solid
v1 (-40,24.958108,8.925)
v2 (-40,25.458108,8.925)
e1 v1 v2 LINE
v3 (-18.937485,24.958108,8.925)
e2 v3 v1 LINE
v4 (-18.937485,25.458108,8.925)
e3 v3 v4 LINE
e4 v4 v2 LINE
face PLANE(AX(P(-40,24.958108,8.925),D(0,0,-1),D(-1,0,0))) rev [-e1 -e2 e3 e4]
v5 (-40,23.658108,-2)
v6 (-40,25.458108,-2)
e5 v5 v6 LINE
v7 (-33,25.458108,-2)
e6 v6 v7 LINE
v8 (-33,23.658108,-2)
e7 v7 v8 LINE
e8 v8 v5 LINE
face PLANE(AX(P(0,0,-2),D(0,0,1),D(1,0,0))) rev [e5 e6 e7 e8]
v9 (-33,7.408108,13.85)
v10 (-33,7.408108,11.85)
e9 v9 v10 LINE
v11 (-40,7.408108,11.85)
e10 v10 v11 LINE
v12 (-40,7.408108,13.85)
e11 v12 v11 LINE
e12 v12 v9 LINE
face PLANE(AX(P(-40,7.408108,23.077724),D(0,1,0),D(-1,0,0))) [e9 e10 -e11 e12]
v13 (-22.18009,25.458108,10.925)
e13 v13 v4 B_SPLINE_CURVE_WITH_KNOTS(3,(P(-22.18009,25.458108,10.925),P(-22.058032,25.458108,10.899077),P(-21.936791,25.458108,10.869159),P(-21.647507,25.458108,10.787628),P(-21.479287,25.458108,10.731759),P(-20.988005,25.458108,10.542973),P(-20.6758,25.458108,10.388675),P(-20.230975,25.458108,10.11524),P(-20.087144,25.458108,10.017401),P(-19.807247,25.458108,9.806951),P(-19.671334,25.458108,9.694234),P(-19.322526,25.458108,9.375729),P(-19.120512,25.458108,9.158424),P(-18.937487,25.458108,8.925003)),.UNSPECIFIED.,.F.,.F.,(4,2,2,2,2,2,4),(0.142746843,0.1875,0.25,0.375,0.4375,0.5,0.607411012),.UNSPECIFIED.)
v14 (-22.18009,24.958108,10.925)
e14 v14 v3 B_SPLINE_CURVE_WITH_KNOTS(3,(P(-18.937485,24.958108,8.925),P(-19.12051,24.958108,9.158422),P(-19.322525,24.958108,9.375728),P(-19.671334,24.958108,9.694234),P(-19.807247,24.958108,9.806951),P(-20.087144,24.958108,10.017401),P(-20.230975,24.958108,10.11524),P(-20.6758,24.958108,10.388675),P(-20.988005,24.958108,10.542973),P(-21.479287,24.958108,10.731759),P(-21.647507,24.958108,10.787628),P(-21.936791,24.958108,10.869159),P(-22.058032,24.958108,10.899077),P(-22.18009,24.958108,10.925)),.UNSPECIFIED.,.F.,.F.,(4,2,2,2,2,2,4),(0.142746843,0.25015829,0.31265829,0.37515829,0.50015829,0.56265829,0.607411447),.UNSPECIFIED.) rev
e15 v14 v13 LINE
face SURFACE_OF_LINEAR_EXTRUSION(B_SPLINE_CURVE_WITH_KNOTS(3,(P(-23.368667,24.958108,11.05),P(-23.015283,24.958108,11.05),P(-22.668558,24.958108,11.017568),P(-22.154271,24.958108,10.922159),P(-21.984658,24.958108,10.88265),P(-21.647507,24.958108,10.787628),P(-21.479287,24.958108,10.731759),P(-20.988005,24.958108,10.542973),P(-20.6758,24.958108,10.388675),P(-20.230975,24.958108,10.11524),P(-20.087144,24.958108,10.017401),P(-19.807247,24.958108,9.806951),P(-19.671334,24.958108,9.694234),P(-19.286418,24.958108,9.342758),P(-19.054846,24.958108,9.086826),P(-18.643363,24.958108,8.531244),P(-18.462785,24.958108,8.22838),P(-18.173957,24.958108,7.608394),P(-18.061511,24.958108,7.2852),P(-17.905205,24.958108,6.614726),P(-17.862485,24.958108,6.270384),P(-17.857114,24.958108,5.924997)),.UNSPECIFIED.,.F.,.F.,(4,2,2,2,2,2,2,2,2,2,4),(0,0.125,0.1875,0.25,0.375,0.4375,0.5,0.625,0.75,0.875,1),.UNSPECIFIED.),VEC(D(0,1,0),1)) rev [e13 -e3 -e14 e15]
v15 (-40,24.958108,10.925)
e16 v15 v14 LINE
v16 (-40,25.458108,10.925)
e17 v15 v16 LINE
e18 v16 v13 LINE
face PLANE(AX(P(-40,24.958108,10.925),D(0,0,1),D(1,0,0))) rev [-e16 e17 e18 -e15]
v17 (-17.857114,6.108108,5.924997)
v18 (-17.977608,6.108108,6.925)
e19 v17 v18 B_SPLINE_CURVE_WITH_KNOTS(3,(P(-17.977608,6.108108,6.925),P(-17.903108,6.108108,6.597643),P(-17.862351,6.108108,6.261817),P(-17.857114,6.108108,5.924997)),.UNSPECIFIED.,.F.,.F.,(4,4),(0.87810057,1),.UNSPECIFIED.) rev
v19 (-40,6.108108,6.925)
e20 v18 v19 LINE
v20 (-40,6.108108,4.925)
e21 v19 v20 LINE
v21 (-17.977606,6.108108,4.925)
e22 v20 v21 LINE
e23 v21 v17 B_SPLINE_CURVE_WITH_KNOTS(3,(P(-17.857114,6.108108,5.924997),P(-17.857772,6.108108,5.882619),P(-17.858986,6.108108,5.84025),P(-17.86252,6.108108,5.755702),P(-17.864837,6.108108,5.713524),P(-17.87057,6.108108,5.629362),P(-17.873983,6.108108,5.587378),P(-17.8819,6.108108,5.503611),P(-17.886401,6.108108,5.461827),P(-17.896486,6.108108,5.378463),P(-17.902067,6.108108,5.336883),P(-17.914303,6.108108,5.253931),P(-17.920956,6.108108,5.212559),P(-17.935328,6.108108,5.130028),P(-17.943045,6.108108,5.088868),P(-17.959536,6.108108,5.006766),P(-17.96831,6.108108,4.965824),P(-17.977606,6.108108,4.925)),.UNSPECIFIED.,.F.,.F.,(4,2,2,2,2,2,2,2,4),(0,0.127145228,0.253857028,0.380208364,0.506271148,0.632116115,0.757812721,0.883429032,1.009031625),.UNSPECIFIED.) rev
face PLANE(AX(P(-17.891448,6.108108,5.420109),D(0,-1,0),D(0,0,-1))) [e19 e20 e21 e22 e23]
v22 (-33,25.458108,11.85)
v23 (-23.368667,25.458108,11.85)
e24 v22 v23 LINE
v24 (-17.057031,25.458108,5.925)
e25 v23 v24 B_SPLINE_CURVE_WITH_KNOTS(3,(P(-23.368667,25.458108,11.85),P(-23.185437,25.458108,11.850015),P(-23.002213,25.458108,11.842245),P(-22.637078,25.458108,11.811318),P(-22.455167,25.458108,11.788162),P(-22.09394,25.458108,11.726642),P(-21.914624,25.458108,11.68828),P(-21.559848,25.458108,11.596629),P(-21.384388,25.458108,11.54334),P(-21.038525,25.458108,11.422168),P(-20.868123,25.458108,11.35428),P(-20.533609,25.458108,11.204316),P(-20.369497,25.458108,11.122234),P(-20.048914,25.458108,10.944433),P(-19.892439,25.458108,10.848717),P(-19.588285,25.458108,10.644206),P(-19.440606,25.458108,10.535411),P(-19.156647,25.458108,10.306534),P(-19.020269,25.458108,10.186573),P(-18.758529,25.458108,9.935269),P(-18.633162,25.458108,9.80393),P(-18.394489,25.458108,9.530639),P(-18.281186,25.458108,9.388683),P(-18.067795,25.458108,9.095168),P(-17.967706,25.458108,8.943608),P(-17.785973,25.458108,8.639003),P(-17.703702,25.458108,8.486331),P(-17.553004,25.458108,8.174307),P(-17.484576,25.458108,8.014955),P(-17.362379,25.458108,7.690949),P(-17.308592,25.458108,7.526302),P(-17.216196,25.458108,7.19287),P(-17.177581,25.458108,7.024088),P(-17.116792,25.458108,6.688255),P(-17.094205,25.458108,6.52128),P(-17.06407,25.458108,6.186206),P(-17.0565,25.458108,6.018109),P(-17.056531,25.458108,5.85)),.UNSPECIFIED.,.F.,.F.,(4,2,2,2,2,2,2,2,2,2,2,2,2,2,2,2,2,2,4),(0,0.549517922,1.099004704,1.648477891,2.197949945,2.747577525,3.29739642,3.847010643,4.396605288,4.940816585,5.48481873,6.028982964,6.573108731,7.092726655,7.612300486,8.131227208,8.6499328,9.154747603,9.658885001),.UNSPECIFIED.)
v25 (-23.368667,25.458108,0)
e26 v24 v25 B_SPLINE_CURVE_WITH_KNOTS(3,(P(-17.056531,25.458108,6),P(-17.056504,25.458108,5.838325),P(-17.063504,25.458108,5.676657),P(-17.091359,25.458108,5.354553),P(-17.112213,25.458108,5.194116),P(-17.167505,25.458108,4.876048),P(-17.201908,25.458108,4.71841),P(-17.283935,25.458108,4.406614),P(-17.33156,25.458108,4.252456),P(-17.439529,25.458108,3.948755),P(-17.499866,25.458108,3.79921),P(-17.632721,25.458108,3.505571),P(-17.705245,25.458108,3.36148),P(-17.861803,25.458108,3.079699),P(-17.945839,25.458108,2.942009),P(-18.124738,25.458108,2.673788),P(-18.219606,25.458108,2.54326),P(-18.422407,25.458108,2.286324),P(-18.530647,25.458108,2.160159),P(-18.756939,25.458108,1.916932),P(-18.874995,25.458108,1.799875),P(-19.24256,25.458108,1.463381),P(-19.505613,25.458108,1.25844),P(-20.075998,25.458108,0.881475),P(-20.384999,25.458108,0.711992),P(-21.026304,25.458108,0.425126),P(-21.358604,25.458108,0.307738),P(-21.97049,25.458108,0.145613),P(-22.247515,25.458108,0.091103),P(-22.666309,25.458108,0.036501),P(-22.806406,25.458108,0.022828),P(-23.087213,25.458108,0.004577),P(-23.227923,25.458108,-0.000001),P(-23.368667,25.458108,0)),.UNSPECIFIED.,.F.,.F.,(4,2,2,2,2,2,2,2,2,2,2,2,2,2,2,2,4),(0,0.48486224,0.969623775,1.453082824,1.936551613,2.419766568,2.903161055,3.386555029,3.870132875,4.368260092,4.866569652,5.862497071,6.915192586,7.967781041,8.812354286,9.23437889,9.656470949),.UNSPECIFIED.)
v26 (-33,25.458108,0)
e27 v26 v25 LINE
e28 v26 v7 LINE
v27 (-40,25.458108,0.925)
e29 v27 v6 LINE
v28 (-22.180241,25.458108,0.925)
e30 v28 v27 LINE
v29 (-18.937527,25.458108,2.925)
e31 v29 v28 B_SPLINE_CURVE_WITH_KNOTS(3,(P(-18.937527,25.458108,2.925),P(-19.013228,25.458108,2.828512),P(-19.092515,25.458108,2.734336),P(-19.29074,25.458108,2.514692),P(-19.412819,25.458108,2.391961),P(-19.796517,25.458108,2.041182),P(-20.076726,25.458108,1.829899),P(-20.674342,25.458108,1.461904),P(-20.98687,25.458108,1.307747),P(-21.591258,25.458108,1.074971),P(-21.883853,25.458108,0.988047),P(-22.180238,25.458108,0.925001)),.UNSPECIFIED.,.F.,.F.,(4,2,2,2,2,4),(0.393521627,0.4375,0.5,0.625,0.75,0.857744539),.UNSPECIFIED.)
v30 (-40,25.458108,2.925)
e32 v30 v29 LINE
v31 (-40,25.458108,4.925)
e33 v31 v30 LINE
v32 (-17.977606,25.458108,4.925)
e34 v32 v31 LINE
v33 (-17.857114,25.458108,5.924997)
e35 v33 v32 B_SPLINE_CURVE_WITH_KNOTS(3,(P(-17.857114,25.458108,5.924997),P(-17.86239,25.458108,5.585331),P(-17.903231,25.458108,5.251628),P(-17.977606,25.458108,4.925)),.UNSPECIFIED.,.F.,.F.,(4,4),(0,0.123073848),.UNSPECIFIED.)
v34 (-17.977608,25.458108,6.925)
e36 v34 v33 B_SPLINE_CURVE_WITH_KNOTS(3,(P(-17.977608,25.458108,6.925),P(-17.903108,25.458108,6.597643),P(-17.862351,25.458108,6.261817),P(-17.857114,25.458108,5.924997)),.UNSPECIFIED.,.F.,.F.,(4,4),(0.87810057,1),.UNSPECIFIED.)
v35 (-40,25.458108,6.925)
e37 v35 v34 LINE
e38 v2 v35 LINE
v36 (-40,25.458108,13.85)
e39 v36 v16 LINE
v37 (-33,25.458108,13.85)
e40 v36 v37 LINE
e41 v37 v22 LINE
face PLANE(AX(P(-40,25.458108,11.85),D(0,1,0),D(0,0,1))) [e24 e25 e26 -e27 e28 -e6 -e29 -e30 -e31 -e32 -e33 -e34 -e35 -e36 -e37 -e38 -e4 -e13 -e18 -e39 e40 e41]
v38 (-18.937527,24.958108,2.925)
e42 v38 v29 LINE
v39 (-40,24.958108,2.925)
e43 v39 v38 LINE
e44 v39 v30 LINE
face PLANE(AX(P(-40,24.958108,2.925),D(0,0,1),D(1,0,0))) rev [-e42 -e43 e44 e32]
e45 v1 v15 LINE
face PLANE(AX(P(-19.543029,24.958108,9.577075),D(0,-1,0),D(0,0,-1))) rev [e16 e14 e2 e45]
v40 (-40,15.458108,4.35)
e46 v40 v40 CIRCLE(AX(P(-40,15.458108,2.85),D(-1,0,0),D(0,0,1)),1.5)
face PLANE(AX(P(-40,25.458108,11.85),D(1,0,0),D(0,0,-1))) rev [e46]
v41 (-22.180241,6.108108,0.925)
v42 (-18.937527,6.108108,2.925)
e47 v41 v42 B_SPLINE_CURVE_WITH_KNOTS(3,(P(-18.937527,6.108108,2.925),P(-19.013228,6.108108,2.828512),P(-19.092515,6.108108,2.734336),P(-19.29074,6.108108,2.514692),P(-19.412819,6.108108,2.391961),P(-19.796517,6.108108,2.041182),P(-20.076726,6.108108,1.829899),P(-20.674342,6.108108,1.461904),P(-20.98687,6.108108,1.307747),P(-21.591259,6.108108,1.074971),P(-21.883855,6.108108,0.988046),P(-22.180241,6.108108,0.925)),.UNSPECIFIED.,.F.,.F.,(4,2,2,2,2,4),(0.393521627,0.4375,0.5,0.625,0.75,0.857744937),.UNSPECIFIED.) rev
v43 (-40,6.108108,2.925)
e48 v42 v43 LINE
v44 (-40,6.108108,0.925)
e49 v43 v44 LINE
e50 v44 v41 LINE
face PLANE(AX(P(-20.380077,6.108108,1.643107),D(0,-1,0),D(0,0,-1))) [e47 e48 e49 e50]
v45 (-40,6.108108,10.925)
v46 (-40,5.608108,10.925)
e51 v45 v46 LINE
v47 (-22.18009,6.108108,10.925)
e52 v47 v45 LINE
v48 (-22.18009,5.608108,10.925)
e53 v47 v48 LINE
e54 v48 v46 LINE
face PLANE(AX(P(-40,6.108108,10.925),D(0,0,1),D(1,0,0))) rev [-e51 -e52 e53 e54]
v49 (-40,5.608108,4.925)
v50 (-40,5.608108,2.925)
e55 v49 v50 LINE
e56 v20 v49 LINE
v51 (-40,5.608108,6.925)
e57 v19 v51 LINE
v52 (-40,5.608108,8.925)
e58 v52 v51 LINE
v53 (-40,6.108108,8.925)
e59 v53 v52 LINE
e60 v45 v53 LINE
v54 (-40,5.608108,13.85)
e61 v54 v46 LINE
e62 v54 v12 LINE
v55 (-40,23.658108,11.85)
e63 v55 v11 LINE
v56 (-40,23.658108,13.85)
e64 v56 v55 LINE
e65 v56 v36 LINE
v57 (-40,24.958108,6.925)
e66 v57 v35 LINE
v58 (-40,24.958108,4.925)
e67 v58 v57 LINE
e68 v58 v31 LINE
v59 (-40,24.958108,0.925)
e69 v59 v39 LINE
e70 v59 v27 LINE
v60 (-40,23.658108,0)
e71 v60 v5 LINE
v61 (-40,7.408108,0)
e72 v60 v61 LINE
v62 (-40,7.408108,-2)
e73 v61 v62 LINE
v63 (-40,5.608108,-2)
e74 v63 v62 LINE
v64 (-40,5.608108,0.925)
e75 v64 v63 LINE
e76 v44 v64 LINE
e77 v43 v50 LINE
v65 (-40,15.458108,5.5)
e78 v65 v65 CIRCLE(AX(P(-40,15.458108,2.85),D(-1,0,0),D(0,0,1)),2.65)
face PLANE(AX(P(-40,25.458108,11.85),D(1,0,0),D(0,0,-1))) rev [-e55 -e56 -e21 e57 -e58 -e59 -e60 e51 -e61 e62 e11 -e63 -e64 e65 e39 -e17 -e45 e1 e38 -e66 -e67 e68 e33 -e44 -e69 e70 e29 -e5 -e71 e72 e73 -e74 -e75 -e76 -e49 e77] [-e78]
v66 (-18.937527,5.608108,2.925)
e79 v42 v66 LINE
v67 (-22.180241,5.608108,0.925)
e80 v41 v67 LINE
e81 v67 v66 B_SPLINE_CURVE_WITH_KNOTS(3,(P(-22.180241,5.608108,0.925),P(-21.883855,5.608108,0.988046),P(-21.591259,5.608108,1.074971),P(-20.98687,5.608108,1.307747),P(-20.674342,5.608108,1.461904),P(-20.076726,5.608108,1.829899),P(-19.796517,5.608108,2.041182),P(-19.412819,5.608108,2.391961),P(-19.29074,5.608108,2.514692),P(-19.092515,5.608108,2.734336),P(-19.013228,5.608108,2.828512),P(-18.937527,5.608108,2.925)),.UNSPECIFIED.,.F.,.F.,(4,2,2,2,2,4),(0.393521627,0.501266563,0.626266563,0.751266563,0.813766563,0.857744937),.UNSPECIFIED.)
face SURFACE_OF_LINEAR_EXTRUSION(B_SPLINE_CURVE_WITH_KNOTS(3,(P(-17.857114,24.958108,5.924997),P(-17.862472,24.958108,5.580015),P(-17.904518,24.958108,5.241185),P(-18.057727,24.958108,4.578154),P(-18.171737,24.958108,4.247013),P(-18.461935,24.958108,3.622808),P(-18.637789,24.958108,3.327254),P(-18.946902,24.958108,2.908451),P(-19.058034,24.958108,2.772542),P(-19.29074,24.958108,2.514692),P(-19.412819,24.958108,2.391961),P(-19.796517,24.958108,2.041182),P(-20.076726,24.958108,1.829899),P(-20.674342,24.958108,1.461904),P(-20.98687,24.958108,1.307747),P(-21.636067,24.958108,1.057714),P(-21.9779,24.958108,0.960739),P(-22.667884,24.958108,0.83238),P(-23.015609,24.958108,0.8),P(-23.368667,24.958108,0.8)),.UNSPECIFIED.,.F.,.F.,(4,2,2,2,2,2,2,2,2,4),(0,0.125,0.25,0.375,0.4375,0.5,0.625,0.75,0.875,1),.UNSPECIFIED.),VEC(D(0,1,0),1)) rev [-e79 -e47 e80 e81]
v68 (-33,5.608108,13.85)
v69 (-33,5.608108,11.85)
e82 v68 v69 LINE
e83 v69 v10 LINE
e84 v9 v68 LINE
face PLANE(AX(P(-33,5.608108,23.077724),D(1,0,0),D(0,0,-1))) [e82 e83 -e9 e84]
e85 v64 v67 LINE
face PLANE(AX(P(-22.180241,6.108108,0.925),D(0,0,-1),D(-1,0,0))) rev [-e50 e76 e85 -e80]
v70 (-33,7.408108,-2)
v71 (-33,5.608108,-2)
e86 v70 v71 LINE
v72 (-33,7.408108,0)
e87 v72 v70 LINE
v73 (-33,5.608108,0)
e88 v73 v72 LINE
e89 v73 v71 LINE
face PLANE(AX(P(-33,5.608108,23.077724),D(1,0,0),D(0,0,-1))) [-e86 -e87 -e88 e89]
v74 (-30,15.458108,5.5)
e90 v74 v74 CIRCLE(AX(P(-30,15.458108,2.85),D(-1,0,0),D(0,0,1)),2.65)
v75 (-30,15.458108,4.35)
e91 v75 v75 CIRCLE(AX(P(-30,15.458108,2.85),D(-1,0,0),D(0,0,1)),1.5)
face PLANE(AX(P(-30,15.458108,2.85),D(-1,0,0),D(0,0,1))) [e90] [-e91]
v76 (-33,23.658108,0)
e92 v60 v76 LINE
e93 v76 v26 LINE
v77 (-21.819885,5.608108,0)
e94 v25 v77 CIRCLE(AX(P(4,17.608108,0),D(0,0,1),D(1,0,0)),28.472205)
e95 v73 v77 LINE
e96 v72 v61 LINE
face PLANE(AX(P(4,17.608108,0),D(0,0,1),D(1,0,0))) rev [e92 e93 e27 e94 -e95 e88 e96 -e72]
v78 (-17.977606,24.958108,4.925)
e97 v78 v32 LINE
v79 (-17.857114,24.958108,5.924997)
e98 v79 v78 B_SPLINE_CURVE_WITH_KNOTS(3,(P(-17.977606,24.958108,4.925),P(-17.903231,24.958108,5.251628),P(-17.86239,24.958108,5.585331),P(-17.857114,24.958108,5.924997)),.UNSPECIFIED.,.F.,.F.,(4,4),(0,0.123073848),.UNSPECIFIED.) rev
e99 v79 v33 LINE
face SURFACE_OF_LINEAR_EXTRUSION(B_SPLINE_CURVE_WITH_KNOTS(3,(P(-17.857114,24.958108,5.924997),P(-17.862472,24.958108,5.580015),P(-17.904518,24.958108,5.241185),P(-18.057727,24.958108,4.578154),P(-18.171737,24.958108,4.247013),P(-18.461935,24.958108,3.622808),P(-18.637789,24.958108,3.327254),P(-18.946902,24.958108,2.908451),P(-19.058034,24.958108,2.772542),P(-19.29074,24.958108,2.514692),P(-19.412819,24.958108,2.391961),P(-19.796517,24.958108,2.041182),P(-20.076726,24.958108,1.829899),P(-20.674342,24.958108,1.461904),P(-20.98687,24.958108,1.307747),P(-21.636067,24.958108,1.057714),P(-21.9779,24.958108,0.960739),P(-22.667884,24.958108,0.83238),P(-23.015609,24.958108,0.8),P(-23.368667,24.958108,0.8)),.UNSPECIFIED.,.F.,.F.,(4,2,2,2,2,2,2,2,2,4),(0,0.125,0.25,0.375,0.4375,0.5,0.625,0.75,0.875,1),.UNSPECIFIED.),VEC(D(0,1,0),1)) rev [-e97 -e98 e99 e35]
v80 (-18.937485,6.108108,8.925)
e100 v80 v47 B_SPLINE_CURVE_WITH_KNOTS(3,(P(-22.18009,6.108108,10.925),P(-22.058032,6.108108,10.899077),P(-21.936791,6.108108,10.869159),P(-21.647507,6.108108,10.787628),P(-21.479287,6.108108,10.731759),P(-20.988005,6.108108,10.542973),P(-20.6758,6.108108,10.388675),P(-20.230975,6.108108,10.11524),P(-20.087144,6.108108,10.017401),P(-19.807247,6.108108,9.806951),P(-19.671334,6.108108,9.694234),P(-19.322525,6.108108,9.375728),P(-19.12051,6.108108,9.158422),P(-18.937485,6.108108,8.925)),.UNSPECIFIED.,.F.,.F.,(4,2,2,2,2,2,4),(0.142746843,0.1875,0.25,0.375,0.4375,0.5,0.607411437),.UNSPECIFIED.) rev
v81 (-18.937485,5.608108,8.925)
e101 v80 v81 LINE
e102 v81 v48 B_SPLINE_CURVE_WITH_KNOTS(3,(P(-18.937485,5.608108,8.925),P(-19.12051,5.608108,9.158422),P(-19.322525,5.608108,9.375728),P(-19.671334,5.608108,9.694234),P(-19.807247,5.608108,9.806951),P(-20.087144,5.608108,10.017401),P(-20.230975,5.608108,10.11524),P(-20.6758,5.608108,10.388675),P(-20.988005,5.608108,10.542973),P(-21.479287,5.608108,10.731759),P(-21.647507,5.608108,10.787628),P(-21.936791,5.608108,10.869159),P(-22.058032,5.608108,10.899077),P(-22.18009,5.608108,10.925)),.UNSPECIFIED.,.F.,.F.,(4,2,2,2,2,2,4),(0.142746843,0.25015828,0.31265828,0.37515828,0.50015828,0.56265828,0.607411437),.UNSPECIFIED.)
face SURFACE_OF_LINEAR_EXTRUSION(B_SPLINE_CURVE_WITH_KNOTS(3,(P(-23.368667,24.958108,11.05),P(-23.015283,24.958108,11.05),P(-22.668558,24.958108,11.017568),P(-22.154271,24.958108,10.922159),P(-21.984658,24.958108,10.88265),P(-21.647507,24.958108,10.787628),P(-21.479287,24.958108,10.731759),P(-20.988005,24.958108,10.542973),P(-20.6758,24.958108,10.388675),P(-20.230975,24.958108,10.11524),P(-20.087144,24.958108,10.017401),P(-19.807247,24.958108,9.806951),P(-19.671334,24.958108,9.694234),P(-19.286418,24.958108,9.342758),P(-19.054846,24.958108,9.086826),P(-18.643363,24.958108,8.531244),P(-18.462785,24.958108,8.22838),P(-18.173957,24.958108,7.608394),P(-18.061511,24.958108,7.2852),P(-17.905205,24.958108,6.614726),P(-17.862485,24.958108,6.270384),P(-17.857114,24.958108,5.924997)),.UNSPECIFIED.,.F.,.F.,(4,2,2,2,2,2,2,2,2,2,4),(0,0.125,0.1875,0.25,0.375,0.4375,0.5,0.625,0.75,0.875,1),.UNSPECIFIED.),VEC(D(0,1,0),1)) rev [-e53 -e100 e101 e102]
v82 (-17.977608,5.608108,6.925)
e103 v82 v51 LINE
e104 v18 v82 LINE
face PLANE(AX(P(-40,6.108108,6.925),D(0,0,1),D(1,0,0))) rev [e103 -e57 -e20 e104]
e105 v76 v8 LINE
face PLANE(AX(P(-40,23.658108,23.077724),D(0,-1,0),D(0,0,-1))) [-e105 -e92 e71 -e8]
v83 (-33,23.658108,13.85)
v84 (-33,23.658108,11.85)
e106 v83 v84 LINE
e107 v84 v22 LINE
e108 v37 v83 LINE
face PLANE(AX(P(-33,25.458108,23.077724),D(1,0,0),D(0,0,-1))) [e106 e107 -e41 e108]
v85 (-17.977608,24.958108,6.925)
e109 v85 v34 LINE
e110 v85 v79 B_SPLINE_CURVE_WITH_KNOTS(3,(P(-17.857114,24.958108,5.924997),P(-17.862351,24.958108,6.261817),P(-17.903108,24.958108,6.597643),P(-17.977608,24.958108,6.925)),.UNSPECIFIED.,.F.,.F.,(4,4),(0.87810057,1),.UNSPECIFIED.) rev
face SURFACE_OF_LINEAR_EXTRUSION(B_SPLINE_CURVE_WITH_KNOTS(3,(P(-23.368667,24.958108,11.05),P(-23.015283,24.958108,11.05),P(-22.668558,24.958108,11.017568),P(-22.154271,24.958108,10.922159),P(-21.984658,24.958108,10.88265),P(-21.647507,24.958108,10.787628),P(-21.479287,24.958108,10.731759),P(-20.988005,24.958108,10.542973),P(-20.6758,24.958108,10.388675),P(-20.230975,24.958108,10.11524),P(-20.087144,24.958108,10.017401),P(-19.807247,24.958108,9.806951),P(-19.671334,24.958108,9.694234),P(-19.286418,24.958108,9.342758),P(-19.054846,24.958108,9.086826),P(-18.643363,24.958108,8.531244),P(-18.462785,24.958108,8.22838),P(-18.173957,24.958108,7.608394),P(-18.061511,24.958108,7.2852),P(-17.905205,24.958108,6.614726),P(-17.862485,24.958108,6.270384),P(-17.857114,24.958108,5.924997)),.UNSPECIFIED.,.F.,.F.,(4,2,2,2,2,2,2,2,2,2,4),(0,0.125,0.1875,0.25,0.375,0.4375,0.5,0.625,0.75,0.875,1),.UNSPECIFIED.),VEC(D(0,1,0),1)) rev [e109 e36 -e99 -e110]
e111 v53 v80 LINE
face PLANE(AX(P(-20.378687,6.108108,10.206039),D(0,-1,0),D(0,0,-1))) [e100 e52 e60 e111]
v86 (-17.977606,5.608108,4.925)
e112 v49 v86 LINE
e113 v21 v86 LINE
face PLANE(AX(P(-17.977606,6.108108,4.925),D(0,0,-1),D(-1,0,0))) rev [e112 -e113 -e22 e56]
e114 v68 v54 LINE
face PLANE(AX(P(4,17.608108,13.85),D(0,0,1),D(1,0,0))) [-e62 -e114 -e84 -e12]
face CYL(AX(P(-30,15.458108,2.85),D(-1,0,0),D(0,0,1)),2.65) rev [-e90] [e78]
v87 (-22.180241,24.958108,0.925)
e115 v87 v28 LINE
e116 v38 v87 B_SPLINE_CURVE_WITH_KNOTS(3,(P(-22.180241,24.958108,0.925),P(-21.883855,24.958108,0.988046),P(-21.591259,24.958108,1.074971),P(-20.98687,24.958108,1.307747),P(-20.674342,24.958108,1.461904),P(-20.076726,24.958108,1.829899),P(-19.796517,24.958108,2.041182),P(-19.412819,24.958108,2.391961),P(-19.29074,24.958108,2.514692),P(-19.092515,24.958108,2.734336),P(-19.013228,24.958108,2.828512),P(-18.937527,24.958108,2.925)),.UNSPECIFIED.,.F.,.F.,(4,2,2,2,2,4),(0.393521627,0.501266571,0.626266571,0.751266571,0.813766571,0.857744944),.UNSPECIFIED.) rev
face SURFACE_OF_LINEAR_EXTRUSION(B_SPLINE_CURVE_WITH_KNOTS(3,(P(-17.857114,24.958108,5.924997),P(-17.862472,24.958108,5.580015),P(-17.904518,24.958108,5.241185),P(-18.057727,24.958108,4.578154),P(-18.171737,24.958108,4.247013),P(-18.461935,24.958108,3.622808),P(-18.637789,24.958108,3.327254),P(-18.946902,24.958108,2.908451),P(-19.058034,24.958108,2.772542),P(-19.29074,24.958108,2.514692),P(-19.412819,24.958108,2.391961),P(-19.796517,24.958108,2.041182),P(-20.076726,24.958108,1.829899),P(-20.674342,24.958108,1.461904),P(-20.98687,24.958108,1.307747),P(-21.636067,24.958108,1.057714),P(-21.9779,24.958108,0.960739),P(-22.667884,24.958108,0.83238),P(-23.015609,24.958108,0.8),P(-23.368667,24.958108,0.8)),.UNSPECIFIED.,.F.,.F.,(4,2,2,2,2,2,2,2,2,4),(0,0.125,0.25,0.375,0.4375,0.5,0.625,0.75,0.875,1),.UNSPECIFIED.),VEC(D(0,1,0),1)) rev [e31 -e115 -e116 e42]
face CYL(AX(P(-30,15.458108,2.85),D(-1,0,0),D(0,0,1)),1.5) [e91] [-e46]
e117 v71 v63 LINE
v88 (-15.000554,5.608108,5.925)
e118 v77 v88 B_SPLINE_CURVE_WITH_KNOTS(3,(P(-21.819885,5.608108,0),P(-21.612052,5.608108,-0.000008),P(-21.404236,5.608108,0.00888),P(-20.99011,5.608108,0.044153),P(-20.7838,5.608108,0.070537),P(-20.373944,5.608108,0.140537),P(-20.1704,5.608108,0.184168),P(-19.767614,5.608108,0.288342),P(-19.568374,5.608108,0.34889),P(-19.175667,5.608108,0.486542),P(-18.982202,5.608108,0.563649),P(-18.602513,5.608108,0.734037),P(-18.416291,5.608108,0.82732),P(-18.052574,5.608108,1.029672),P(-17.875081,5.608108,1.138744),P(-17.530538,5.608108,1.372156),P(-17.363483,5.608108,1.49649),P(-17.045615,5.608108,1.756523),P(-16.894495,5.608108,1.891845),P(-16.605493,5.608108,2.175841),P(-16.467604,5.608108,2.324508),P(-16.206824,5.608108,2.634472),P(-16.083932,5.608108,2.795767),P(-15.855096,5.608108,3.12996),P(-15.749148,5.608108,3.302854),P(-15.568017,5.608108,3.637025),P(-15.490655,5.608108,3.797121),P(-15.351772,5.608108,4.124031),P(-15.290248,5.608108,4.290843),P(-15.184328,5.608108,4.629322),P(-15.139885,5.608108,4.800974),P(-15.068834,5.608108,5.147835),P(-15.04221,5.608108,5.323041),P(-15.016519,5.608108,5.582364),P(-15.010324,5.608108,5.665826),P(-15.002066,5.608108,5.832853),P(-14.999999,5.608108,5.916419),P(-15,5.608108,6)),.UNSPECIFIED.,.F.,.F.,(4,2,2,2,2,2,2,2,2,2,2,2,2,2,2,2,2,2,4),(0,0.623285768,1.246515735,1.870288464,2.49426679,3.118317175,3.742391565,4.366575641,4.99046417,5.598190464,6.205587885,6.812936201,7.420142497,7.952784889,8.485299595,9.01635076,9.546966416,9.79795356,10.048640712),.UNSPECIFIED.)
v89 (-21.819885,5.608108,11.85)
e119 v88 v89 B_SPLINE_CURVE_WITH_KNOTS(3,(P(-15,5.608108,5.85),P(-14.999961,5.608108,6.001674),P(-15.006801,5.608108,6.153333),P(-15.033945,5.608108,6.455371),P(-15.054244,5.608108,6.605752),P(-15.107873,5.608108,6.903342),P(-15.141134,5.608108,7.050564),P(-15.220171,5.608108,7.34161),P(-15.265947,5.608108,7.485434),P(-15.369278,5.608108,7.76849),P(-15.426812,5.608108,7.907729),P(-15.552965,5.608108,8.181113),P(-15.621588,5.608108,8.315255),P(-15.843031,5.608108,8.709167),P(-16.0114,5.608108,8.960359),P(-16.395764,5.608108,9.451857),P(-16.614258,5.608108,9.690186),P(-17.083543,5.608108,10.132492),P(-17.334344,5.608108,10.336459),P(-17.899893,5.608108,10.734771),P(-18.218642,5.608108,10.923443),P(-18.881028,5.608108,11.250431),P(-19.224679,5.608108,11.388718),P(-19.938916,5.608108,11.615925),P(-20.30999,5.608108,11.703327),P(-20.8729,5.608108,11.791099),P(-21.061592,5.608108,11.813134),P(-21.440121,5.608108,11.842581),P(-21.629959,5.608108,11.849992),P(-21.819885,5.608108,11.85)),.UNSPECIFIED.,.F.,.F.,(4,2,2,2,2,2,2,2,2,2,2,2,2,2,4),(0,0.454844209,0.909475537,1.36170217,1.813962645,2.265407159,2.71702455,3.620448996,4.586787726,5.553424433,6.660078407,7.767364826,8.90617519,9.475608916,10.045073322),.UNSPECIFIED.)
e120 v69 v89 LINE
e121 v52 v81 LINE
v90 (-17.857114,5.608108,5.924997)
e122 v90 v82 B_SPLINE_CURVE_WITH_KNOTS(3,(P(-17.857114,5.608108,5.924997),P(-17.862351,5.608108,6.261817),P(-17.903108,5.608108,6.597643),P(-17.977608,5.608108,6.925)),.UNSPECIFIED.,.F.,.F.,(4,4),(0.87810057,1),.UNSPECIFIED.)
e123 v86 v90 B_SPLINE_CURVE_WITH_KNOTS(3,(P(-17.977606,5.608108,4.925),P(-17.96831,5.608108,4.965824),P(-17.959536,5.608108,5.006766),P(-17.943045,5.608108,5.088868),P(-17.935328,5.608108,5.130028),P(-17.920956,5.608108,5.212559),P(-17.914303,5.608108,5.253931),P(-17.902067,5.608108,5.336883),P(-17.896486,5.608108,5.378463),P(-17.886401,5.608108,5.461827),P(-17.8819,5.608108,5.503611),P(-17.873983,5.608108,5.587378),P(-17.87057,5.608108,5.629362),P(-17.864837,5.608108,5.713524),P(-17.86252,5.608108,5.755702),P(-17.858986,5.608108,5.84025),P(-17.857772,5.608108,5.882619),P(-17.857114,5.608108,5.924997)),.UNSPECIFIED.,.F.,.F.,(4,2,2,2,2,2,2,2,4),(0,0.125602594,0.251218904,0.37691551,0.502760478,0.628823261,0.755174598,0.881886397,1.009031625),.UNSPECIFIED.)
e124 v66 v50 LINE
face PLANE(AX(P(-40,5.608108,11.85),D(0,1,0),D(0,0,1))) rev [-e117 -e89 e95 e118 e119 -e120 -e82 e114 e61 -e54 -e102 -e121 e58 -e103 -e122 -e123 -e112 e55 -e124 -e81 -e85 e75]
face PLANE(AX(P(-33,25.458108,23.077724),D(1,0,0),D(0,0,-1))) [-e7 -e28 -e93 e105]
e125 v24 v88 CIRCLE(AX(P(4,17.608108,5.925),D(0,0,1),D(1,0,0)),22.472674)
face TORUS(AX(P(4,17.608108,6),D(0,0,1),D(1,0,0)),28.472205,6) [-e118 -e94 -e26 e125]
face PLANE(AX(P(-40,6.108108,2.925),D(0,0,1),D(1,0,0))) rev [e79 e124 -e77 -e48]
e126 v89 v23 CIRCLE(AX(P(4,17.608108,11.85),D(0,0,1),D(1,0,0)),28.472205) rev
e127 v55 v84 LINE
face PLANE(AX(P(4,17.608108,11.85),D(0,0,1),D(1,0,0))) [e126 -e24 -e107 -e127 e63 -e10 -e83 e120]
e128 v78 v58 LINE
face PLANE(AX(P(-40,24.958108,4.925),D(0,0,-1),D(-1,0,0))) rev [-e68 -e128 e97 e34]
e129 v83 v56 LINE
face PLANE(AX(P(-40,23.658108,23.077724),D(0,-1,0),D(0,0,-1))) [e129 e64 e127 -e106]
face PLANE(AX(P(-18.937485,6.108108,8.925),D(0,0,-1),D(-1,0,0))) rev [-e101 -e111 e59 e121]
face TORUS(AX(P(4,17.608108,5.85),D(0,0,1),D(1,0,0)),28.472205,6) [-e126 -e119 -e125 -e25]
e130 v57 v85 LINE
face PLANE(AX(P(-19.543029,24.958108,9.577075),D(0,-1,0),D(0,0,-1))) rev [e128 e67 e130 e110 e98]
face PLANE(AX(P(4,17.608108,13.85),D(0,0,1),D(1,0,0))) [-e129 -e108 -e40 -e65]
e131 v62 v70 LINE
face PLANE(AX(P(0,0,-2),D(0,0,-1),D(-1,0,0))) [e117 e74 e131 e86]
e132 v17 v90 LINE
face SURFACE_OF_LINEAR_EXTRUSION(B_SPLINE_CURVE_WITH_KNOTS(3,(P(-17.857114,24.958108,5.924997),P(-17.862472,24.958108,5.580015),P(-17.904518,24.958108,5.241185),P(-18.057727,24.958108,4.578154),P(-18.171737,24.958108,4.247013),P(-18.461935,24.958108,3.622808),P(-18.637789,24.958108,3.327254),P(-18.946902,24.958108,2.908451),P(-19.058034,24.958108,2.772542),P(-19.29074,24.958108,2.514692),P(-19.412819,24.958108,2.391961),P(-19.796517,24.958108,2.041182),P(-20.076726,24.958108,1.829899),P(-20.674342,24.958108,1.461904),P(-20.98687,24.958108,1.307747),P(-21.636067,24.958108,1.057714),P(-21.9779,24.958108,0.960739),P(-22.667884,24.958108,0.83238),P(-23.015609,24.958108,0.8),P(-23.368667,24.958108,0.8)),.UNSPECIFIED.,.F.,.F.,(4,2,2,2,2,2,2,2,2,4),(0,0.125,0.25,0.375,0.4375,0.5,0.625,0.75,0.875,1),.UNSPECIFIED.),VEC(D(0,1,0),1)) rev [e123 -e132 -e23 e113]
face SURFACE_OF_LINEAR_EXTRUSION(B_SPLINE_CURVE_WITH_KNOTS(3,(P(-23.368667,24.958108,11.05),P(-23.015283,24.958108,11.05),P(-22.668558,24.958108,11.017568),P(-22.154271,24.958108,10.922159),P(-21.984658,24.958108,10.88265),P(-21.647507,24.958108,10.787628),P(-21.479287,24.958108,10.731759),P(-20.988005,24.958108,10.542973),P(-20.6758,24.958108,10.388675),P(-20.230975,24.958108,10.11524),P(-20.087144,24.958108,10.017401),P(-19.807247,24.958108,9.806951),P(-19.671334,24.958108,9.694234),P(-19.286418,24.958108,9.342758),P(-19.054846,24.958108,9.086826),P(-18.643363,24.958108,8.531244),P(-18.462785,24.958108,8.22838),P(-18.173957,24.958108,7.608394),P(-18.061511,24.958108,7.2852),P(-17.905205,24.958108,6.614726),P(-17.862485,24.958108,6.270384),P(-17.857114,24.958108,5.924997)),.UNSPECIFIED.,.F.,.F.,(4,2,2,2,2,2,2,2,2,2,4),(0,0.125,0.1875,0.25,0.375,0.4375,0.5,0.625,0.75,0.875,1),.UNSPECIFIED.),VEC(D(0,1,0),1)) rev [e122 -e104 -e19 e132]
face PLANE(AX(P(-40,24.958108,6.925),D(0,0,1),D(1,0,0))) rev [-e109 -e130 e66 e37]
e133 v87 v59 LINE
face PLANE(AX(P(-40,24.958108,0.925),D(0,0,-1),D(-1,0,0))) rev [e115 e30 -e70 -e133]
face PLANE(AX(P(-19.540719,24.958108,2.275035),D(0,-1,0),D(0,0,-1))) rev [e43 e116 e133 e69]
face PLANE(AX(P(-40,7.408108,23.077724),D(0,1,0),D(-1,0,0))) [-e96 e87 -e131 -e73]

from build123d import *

# Parameters (mm, degrees)
BOSS_EXTRUDE1_DEPTH      = 11.85
BOSS_EXTRUDE2_DEPTH      = 2
BOSS_EXTRUDE2_DEPTH_BACK = 13.85
SKETCH2_W                = 7
SKETCH2_H                = 1.8
FILLET1_R                = 6
CUT_EXTRUDE1_DEPTH       = 0.5
CUT_EXTRUDE2_DEPTH       = 0.5
SKETCH6_R                = 2.65
SKETCH6_R_2              = 1.5
CUT_EXTRUDE3_DEPTH       = 10


with BuildPart() as part:
    # Sketch1 → Boss-Extrude1 (new body)
    with BuildSketch(Plane.XY):
        with BuildLine():
            Line((-40, 25.458108108), (-17.056531053, 25.458108108))
            ThreePointArc((-17.056531053, 25.458108108), (-18.352562381, 15.292302634), (-15, 5.608108108))
            Line((-15, 5.608108108), (-40, 5.608108108))
            Line((-40, 5.608108108), (-40, 25.458108108))
        make_face()
    extrude(amount=BOSS_EXTRUDE1_DEPTH)

    # Sketch2 → Boss-Extrude2 (add, two sides: drawn at the far end of the back side and taken through both)
    with BuildSketch(Plane(origin=(0, 0, 0), x_dir=(-1, 0, 0), z_dir=(0, 0, -1)).offset(-BOSS_EXTRUDE2_DEPTH_BACK)):
        with Locations((36.5, 6.508108108)):
            Rectangle(SKETCH2_W, SKETCH2_H)
        with Locations((36.5, 24.558108108)):
            Rectangle(SKETCH2_W, SKETCH2_H)
    extrude(amount=BOSS_EXTRUDE2_DEPTH + BOSS_EXTRUDE2_DEPTH_BACK)

    # Fillet1
    # the kernel refuses this fillet: 6 mm, written as the material it takes off along each edge
    with BuildSketch(Plane(origin=(4, 17.608108108, 0), x_dir=(-0.5195868737353421, 0.854417626598336, 0), z_dir=(0.854417626598336, 0.5195868737353421, 0))) as fillet1_piece_1:
        with BuildLine():
            CenterArc((22.472205054 + FILLET1_R, FILLET1_R), FILLET1_R, 180, 90)
            Line((22.472205054 + FILLET1_R, 0), (22.472205054, 0))
            Line((22.472205054, 0), (22.472205054, FILLET1_R))
        make_face()
    revolve(axis=Axis((4, 17.608108108, 0), (0, 0, 1)), revolution_arc=129.220802233, mode=Mode.SUBTRACT)
    with BuildSketch(Plane(origin=(4, 17.608108108, 11.85), x_dir=(-0.5195868737353421, 0.854417626598336, 0), z_dir=(0.854417626598336, 0.5195868737353421, 0))) as fillet1_piece_2:
        with BuildLine():
            CenterArc((22.472205054 + FILLET1_R, -FILLET1_R), FILLET1_R, 90, 90)
            Line((22.472205054, -FILLET1_R), (22.472205054, 0))
            Line((22.472205054, 0), (22.472205054 + FILLET1_R, 0))
        make_face()
    revolve(axis=Axis((4, 17.608108108, 11.85), (0, 0, 1)), revolution_arc=129.220802233, mode=Mode.SUBTRACT)

    # Sketch3 → Cut-Extrude1 (cut)
    with BuildSketch(Plane(origin=(0, 25.458108108, 0), x_dir=(1, 0, 0), z_dir=(0, 1, 0))):
        with BuildLine():
            Line((-40, -0.925), (-22.180241126, -0.925))
            add(Edge.make_bspline(
                [(-18.937526934, -2.925), (-19.013227922, -2.828512493), (-19.092514949, -2.73433601), (-19.290739716, -2.514692345), (-19.412819443, -2.391961398), (-19.796517456, -2.041181837), (-20.076726357, -1.829898628), (-20.674341708, -1.461904013), (-20.986869841, -1.307747212), (-21.591258811, -1.074971042), (-21.88385471, -0.988046248), (-22.180241126, -0.925)],
                knots=[0.393521627, 0.393521627, 0.393521627, 0.393521627, 0.4375, 0.4375, 0.5, 0.5, 0.625, 0.625, 0.75, 0.75, 0.857744944, 0.857744944, 0.857744944, 0.857744944], degree=3))
            Line((-18.937526934, -2.925), (-40, -2.925))
            Line((-40, -2.925), (-40, -0.925))
        make_face()
        with BuildLine():
            Line((-40, -4.925), (-17.97760602, -4.925))
            add(Edge.make_bspline(
                [(-17.857114262, -5.924996789), (-17.862389732, -5.585330665), (-17.903230985, -5.251628442), (-17.97760602, -4.925)],
                knots=[0, 0, 0, 0, 0.123073848, 0.123073848, 0.123073848, 0.123073848], degree=3))
            add(Edge.make_bspline(
                [(-17.977607618, -6.925), (-17.903108355, -6.597642735), (-17.862351336, -6.26181668), (-17.857114262, -5.924996789)],
                knots=[0.87810057, 0.87810057, 0.87810057, 0.87810057, 1, 1, 1, 1], degree=3))
            Line((-17.977607618, -6.925), (-40, -6.925))
            Line((-40, -6.925), (-40, -4.925))
        make_face()
        with BuildLine():
            Line((-40, -8.925), (-18.937485208, -8.925))
            add(Edge.make_bspline(
                [(-22.180090087, -10.925), (-22.058031588, -10.899076779), (-21.936790659, -10.869159263), (-21.647506804, -10.787627729), (-21.479286663, -10.731759415), (-20.988005272, -10.542973422), (-20.675799804, -10.388674568), (-20.230975304, -10.115240101), (-20.087143687, -10.017400974), (-19.80724707, -9.806950573), (-19.671333831, -9.694234428), (-19.322525279, -9.375728013), (-19.120509969, -9.15842179), (-18.937485208, -8.925)],
                knots=[0.142746843, 0.142746843, 0.142746843, 0.142746843, 0.1875, 0.1875, 0.25, 0.25, 0.375, 0.375, 0.4375, 0.4375, 0.5, 0.5, 0.607411447, 0.607411447, 0.607411447, 0.607411447], degree=3))
            Line((-22.180090087, -10.925), (-40, -10.925))
            Line((-40, -10.925), (-40, -8.925))
        make_face()
    extrude(amount=-CUT_EXTRUDE1_DEPTH, mode=Mode.SUBTRACT)

    # Sketch4 → Cut-Extrude2 (cut)
    with BuildSketch(Plane.XZ.offset(-5.608108108)):
        with BuildLine():
            Line((-18.937485208, 8.925), (-40, 8.925))
            Line((-40, 8.925), (-40, 10.925))
            Line((-40, 10.925), (-22.180090087, 10.925))
            add(Edge.make_bspline(
                [(-22.180090087, 10.925), (-22.058031589, 10.899076779), (-21.936790659, 10.869159263), (-21.647506804, 10.787627729), (-21.479286663, 10.731759415), (-20.988005272, 10.542973422), (-20.675799804, 10.388674568), (-20.230975304, 10.115240101), (-20.087143687, 10.017400974), (-19.80724707, 9.806950573), (-19.671333831, 9.694234428), (-19.322525301, 9.375728033), (-19.12051001, 9.158421833), (-18.937485208, 8.925)],
                knots=[0.392588564, 0.392588564, 0.392588564, 0.392588564, 0.437341721, 0.437341721, 0.499841721, 0.499841721, 0.624841721, 0.624841721, 0.687341721, 0.687341721, 0.749841721, 0.749841721, 0.857253157, 0.857253157, 0.857253157, 0.857253157], degree=3))
        make_face()
        with BuildLine():
            Line((-40, 6.925), (-17.977607618, 6.925))
            add(Edge.make_bspline(
                [(-17.977607618, 6.925), (-17.903108355, 6.597642735), (-17.862351336, 6.26181668), (-17.857114262, 5.924996789)],
                knots=[0, 0, 0, 0, 0.12189943, 0.12189943, 0.12189943, 0.12189943], degree=3))
            add(Edge.make_bspline(
                [(-17.857114262, 5.924996789), (-17.862389732, 5.585330665), (-17.903230985, 5.251628442), (-17.97760602, 4.925)],
                knots=[0.876926152, 0.876926152, 0.876926152, 0.876926152, 1, 1, 1, 1], degree=3))
            Line((-17.97760602, 4.925), (-40, 4.925))
            Line((-40, 4.925), (-40, 6.925))
        make_face()
        with BuildLine():
            Line((-40, 2.925), (-18.937526934, 2.925))
            add(Edge.make_bspline(
                [(-18.937526934, 2.925), (-19.013227922, 2.828512493), (-19.092514949, 2.73433601), (-19.290739716, 2.514692345), (-19.412819443, 2.391961398), (-19.796517456, 2.041181837), (-20.076726357, 1.829898628), (-20.674341708, 1.461904013), (-20.986869841, 1.307747212), (-21.591258789, 1.07497105), (-21.883854665, 0.988046261), (-22.180241126, 0.925)],
                knots=[0.142255064, 0.142255064, 0.142255064, 0.142255064, 0.186233438, 0.186233438, 0.248733438, 0.248733438, 0.373733438, 0.373733438, 0.498733438, 0.498733438, 0.606478373, 0.606478373, 0.606478373, 0.606478373], degree=3))
            Line((-22.180241126, 0.925), (-40, 0.925))
            Line((-40, 0.925), (-40, 2.925))
        make_face()
    extrude(amount=-CUT_EXTRUDE2_DEPTH, mode=Mode.SUBTRACT)

    # Sketch6 → Cut-Extrude3 (cut)
    with BuildSketch(Plane.ZY.offset(40)):
        with Locations((2.85, 15.458108108)):
            Circle(SKETCH6_R)
        with Locations((2.85, 15.458108108)):
            Circle(SKETCH6_R_2, mode=Mode.SUBTRACT)
    extrude(amount=-CUT_EXTRUDE3_DEPTH, mode=Mode.SUBTRACT)


solid = part.part
